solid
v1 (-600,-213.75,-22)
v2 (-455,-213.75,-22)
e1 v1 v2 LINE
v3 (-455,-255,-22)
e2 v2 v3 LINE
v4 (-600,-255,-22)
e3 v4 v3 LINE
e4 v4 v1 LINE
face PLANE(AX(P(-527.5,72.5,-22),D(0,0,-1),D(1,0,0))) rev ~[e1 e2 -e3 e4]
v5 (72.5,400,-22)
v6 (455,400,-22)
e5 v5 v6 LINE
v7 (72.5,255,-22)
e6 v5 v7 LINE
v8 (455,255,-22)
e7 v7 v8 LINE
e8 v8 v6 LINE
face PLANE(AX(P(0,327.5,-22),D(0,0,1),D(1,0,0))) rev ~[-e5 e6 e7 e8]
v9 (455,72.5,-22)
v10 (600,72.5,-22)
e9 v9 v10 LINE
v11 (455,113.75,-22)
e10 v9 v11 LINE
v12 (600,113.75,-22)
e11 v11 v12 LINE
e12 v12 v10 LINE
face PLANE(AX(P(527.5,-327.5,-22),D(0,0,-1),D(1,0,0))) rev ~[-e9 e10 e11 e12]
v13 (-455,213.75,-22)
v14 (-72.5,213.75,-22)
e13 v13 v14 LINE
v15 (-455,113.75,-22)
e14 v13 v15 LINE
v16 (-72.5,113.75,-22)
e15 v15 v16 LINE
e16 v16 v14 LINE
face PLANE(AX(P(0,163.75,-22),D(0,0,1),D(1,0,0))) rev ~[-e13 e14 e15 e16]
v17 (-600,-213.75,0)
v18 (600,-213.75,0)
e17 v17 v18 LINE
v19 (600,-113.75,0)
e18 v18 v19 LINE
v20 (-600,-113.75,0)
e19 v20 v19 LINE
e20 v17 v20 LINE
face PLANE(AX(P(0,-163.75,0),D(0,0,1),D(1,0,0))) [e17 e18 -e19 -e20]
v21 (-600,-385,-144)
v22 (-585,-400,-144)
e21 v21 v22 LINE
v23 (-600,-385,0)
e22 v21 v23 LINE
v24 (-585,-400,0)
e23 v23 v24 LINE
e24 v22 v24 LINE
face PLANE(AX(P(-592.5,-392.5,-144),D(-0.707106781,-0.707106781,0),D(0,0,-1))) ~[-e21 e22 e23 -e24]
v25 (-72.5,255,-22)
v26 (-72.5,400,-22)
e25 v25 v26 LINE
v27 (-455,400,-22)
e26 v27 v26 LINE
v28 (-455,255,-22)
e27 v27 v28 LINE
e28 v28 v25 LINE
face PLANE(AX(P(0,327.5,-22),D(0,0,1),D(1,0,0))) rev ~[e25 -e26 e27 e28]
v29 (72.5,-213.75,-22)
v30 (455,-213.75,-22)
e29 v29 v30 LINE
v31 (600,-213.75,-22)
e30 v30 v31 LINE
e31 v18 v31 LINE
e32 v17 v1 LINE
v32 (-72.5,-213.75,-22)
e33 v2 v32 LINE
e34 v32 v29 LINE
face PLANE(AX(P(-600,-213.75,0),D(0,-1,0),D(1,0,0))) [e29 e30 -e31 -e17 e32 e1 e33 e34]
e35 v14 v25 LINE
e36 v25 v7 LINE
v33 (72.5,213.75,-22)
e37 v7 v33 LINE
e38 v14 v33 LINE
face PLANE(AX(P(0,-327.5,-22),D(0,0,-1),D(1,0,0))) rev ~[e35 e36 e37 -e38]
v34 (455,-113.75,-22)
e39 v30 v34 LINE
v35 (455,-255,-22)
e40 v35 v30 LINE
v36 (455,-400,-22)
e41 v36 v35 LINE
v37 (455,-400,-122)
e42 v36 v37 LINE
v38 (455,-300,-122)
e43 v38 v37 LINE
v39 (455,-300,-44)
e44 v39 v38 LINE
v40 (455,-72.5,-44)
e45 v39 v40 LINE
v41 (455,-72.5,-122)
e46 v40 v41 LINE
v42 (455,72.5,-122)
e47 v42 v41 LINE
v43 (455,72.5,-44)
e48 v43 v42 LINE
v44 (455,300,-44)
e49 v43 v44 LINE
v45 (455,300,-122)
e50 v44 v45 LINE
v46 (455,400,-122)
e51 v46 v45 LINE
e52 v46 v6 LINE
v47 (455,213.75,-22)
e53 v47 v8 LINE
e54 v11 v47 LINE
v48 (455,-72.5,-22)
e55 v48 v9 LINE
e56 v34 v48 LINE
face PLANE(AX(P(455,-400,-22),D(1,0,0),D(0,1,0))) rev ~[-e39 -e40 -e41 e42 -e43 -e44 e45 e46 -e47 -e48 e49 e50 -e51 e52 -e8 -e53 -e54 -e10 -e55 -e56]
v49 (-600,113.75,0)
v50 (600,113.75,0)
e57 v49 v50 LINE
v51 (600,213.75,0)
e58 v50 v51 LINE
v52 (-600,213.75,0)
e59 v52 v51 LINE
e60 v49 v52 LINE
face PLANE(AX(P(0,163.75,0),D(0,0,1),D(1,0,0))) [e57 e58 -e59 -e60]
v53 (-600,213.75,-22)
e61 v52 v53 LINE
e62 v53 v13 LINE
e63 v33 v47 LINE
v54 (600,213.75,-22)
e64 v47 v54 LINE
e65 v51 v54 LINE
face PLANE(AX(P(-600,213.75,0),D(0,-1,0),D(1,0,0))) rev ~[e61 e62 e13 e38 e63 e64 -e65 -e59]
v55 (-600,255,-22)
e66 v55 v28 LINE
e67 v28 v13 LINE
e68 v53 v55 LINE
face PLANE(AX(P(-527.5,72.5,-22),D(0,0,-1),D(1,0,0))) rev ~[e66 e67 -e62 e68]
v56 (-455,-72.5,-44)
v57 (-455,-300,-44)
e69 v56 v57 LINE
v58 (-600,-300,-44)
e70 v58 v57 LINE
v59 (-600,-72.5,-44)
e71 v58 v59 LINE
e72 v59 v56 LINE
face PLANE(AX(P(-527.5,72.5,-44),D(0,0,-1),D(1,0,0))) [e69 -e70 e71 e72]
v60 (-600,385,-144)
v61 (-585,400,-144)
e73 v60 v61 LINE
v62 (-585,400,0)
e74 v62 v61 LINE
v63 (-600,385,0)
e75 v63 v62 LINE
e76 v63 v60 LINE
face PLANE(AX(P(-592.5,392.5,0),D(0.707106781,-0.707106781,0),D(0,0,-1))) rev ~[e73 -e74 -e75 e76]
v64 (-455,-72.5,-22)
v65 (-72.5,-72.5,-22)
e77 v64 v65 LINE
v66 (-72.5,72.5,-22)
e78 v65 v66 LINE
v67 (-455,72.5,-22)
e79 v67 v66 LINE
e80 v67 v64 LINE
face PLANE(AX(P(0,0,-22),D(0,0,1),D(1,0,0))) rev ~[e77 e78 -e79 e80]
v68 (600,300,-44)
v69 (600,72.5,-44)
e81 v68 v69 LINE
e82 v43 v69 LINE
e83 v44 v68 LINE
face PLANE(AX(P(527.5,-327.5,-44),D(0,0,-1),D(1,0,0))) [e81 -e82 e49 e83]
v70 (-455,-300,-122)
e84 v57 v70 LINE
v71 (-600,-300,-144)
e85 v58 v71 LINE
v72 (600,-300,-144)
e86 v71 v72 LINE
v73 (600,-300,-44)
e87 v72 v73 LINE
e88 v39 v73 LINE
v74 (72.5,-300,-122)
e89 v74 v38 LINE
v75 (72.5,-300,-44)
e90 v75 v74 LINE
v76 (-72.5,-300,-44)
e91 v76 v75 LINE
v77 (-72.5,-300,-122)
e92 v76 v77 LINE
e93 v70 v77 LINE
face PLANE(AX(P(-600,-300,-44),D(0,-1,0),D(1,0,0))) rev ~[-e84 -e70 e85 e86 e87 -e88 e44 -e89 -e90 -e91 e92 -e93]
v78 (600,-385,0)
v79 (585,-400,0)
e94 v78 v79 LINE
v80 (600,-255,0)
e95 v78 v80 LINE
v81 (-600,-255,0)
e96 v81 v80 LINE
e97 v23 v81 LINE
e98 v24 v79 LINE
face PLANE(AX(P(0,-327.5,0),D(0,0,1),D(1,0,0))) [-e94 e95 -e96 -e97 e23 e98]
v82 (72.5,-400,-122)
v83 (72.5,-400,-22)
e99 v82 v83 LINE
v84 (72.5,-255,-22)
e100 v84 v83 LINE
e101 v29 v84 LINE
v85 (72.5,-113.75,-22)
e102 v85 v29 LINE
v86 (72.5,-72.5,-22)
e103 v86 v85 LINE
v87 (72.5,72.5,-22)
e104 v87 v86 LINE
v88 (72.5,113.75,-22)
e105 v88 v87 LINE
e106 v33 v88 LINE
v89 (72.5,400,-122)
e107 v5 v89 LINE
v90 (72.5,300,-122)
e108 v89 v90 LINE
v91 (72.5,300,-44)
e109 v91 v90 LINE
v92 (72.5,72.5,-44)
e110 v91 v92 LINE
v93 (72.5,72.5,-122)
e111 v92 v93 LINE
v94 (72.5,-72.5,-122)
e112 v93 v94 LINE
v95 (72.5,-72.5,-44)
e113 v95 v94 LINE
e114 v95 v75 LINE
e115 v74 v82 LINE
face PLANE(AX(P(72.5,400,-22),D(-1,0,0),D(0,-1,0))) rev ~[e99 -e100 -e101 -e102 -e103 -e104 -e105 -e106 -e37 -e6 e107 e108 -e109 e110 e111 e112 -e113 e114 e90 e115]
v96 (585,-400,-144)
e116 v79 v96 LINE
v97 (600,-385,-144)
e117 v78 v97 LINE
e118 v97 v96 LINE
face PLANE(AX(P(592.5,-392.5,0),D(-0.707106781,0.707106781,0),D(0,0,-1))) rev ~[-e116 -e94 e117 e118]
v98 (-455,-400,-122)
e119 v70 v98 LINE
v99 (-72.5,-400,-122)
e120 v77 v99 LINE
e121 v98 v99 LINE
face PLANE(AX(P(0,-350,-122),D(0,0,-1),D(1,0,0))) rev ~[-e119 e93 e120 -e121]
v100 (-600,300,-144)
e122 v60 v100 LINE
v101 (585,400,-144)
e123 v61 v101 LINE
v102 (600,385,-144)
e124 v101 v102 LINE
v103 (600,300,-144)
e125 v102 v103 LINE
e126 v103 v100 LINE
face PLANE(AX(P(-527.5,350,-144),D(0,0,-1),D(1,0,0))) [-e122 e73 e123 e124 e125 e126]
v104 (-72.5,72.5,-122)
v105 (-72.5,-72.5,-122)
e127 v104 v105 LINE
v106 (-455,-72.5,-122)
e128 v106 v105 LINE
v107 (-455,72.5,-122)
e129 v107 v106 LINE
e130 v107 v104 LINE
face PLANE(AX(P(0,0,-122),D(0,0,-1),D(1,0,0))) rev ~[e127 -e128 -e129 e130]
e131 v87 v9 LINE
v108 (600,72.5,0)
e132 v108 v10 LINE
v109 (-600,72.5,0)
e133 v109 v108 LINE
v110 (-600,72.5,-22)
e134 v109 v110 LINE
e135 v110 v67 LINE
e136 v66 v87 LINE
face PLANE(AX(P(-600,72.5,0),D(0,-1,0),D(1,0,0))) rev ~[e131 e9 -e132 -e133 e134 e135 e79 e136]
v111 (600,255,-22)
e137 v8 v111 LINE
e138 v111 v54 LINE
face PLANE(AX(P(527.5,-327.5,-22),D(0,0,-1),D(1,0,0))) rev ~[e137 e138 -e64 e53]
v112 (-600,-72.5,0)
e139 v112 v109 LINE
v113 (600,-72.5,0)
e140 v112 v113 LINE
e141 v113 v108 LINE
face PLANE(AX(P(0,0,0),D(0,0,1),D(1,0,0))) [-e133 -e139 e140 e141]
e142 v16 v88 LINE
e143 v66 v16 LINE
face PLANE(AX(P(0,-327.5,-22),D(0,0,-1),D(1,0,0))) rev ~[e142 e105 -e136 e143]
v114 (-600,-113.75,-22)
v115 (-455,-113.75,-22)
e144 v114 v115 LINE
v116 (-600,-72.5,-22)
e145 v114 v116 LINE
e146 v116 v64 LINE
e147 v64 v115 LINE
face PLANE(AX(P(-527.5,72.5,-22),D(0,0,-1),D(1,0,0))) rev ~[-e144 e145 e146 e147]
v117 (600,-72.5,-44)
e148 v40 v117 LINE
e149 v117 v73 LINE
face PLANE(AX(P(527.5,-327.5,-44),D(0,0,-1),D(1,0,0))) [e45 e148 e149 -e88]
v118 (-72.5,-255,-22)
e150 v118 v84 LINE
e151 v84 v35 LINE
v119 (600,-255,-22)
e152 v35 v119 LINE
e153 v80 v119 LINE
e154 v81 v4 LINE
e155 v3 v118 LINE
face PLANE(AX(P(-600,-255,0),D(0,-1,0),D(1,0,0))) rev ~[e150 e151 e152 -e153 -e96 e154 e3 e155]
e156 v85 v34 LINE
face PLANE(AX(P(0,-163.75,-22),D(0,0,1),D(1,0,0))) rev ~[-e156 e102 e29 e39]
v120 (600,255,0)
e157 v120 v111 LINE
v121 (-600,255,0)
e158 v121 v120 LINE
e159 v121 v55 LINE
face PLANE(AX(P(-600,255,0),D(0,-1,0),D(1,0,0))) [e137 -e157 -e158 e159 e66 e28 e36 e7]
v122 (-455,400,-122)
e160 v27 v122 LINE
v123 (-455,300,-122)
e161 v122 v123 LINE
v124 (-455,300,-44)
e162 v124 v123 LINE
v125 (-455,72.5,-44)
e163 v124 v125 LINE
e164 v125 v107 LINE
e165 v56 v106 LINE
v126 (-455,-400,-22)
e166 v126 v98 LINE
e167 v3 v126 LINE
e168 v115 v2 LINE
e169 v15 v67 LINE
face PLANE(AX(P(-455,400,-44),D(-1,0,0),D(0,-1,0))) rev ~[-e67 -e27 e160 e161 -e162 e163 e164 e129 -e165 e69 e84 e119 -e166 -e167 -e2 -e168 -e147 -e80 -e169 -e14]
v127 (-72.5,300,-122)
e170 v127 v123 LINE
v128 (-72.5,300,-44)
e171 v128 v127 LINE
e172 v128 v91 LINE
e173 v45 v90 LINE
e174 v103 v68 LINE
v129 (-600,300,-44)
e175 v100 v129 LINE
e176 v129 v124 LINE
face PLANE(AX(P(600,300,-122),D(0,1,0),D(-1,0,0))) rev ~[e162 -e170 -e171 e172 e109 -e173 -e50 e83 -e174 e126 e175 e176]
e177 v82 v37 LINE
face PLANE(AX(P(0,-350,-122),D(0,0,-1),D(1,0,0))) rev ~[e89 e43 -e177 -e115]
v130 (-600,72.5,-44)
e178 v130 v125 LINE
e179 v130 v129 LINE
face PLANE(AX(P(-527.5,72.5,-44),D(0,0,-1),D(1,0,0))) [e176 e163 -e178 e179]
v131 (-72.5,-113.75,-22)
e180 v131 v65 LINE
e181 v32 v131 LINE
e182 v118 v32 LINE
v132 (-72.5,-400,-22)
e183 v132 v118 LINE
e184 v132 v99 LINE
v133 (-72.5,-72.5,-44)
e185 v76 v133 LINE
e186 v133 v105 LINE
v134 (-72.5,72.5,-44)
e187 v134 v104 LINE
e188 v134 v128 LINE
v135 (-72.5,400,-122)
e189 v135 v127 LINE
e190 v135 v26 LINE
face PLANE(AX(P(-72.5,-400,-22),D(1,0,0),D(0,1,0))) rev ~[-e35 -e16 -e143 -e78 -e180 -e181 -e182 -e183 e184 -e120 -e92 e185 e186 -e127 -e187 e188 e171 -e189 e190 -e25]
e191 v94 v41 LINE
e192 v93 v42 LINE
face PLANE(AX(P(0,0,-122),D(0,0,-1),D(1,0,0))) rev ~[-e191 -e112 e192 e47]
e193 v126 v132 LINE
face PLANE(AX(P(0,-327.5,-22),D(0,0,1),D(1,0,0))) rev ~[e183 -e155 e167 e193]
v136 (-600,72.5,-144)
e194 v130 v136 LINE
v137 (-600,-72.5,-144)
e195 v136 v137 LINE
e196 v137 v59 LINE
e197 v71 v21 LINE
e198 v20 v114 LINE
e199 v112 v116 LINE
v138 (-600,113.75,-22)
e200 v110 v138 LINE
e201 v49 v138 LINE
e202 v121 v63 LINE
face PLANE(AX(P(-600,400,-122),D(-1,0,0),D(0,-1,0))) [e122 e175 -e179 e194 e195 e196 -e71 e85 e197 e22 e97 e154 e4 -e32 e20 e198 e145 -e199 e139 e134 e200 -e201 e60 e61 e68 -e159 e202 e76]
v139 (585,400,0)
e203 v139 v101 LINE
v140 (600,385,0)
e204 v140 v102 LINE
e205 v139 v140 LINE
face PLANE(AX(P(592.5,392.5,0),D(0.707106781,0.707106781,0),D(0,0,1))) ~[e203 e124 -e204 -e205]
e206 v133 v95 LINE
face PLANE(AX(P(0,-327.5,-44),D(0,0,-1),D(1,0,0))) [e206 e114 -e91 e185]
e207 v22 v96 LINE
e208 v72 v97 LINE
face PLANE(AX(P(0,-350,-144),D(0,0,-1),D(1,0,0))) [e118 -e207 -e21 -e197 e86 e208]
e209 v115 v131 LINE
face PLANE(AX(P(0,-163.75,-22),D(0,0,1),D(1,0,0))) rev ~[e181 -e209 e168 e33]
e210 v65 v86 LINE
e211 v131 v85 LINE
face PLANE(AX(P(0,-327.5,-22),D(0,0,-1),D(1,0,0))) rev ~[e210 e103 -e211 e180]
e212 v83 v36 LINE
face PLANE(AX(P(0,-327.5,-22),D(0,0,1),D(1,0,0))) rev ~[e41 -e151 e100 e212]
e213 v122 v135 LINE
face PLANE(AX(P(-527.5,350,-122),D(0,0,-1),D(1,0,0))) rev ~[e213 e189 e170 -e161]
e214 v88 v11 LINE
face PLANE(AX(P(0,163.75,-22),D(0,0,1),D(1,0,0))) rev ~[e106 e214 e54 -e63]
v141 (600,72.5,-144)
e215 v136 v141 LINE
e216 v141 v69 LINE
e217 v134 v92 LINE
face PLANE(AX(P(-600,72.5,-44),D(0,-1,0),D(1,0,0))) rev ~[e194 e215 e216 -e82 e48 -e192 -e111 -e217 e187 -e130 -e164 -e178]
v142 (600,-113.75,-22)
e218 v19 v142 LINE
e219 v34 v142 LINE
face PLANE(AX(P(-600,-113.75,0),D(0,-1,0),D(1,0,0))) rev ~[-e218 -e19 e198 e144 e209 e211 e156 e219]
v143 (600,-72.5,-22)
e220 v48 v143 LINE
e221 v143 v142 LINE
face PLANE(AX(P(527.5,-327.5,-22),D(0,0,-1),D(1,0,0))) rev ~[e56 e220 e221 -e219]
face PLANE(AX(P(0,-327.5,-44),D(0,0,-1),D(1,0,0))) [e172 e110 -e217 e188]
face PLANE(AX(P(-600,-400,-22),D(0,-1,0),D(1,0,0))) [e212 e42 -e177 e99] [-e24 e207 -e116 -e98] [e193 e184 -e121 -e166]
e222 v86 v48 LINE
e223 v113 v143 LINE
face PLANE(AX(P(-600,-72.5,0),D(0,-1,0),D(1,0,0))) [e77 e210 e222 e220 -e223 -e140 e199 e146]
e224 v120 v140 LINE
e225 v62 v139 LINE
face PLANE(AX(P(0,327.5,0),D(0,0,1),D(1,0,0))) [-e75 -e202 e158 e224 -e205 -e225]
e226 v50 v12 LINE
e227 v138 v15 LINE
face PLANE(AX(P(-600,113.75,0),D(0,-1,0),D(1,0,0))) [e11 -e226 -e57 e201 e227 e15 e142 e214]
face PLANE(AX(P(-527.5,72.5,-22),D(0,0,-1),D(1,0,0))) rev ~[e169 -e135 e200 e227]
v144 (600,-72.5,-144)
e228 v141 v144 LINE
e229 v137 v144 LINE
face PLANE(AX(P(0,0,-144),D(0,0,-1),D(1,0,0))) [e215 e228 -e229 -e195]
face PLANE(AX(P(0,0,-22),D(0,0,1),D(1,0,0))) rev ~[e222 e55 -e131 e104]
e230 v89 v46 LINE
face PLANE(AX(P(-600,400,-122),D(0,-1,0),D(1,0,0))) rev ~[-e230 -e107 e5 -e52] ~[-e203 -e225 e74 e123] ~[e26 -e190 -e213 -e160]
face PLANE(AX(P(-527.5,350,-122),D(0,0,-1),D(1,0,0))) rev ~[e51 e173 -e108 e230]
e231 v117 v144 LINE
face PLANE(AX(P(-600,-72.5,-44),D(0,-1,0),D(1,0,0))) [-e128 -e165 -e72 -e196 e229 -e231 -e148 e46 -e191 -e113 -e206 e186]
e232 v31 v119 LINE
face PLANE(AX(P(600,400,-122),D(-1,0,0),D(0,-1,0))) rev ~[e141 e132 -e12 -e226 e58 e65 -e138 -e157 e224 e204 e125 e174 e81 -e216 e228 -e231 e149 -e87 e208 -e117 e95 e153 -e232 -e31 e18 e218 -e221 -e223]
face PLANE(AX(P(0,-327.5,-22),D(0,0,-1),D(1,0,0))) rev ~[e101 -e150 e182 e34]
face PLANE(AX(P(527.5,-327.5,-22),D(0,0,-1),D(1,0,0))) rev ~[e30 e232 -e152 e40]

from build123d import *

# Parameters (mm, degrees)
F0_W     = 1200
F0_H     = 145
F1_DEPTH = 22
F0_H_2   = 100
F2_W     = 145
F2_H     = 655
F2_H_2   = 145
F3_DEPTH = 22
F4_W     = 145
F4_H     = 100
F4_H_2   = 145
F5_W     = 145
F5_H     = 145
F5_H_2   = 100
F6_DEPTH = 78
F7_W     = 145
F7_H     = 100
F7_W_2   = 1055
F7_W_3   = 1200
F7_H_2   = 145
F8_DEPTH = 22
F9_SIZE  = 15


# Not quite as in the source:
# - a feature names something its author has since deleted; it is built from what else it names


with BuildPart() as f1:
    # F0 (on Top) → F1 (new body)
    with BuildSketch(Plane.XY):
        with Locations((0, 327.5)):
            Rectangle(F0_W, F0_H)
    extrude(amount=-F1_DEPTH)



with BuildPart() as f1b:
    # F0 (on Top) → F1, piece 2 (new body)
    with BuildSketch(Plane.XY):
        with Locations((0, 163.75)):
            Rectangle(F0_W, F0_H_2)
    extrude(amount=-F1_DEPTH)


with BuildPart() as f1c:
    # F0 (on Top) → F1, piece 3 (new body)
    with BuildSketch(Plane.XY):
        Rectangle(F0_W, F0_H)
    extrude(amount=-F1_DEPTH)


with BuildPart() as f1d:
    # F0 (on Top) → F1, piece 4 (new body)
    with BuildSketch(Plane.XY):
        with Locations((0, -163.75)):
            Rectangle(F0_W, F0_H_2)
    extrude(amount=-F1_DEPTH)


with BuildPart() as f1e:
    # F0 (on Top) → F1, piece 5 (new body)
    with BuildSketch(Plane.XY):
        with Locations((0, -327.5)):
            Rectangle(F0_W, F0_H)
    extrude(amount=-F1_DEPTH)


with BuildPart() as f1_1:
    add(f1.part)

    add(f1b.part)  # F3 merges F1b

    add(f1c.part)  # F3 merges F1c

    add(f1d.part)  # F3 merges F1d

    add(f1e.part)  # F3 merges F1e
    # F2 (on face) → F3 (join)
    with BuildSketch(Plane(origin=(0, 0, -22), x_dir=(1, 0, 0), z_dir=(0, 0, -1))):
        with Locations((-527.5, -72.5)):
            Rectangle(F2_W, F2_H)
        with Locations((-527.5, 327.5)):
            Rectangle(F2_W, F2_H_2)
        with Locations((0, 327.5)):
            Rectangle(F2_W, F2_H_2)
        with Locations((0, -72.5)):
            Rectangle(F2_W, F2_H)
        with Locations((527.5, 327.5)):
            Rectangle(F2_W, F2_H_2)
        with Locations((527.5, -72.5)):
            Rectangle(F2_W, F2_H)
    extrude(amount=F3_DEPTH)

    # F4 (on face) + F5 (on face) → F6 (join)
    with BuildSketch(Plane(origin=(0, 0, -44), x_dir=(1, 0, 0), z_dir=(0, 0, -1))):
        with Locations((-527.5, -350)):
            Rectangle(F4_W, F4_H)
        with Locations((-527.5, 350)):
            Rectangle(F4_W, F4_H)
        with Locations((527.5, -350)):
            Rectangle(F4_W, F4_H)
        with Locations((527.5, 0)):
            Rectangle(F4_W, F4_H_2)
        with Locations((527.5, 350)):
            Rectangle(F4_W, F4_H)
        with Locations((-527.5, 0)):
            Rectangle(F4_W, F4_H_2)
    with BuildSketch(Plane(origin=(0, 0, -44), x_dir=(1, 0, 0), z_dir=(0, 0, -1))):
        Rectangle(F5_W, F5_H)
        with Locations((0, 350)):
            Rectangle(F5_W, F5_H_2)
        with Locations((0, -350)):
            Rectangle(F5_W, F5_H_2)
    extrude(amount=F6_DEPTH)

    # F7 (on face) → F8 (join)
    with BuildSketch(Plane(origin=(0, 0, -122), x_dir=(1, 0, 0), z_dir=(0, 0, -1))):
        with Locations((-527.5, -350)):
            Rectangle(F7_W, F7_H)
        with Locations((72.5, -350)):
            Rectangle(F7_W_2, F7_H)
        Rectangle(F7_W_3, F7_H_2)
        with Locations((0, 350)):
            Rectangle(F7_W_3, F7_H)
    extrude(amount=F8_DEPTH)

    # F9
    f9_edges = [f1_1.edges().sort_by_distance(p)[0] for p in [
        (-600, -400, -72),
        (600, -400, -72),
        (600, 400, -72),
        (-600, 400, -72),
    ]]
    chamfer(f9_edges, length=F9_SIZE)


solid = f1_1.part
